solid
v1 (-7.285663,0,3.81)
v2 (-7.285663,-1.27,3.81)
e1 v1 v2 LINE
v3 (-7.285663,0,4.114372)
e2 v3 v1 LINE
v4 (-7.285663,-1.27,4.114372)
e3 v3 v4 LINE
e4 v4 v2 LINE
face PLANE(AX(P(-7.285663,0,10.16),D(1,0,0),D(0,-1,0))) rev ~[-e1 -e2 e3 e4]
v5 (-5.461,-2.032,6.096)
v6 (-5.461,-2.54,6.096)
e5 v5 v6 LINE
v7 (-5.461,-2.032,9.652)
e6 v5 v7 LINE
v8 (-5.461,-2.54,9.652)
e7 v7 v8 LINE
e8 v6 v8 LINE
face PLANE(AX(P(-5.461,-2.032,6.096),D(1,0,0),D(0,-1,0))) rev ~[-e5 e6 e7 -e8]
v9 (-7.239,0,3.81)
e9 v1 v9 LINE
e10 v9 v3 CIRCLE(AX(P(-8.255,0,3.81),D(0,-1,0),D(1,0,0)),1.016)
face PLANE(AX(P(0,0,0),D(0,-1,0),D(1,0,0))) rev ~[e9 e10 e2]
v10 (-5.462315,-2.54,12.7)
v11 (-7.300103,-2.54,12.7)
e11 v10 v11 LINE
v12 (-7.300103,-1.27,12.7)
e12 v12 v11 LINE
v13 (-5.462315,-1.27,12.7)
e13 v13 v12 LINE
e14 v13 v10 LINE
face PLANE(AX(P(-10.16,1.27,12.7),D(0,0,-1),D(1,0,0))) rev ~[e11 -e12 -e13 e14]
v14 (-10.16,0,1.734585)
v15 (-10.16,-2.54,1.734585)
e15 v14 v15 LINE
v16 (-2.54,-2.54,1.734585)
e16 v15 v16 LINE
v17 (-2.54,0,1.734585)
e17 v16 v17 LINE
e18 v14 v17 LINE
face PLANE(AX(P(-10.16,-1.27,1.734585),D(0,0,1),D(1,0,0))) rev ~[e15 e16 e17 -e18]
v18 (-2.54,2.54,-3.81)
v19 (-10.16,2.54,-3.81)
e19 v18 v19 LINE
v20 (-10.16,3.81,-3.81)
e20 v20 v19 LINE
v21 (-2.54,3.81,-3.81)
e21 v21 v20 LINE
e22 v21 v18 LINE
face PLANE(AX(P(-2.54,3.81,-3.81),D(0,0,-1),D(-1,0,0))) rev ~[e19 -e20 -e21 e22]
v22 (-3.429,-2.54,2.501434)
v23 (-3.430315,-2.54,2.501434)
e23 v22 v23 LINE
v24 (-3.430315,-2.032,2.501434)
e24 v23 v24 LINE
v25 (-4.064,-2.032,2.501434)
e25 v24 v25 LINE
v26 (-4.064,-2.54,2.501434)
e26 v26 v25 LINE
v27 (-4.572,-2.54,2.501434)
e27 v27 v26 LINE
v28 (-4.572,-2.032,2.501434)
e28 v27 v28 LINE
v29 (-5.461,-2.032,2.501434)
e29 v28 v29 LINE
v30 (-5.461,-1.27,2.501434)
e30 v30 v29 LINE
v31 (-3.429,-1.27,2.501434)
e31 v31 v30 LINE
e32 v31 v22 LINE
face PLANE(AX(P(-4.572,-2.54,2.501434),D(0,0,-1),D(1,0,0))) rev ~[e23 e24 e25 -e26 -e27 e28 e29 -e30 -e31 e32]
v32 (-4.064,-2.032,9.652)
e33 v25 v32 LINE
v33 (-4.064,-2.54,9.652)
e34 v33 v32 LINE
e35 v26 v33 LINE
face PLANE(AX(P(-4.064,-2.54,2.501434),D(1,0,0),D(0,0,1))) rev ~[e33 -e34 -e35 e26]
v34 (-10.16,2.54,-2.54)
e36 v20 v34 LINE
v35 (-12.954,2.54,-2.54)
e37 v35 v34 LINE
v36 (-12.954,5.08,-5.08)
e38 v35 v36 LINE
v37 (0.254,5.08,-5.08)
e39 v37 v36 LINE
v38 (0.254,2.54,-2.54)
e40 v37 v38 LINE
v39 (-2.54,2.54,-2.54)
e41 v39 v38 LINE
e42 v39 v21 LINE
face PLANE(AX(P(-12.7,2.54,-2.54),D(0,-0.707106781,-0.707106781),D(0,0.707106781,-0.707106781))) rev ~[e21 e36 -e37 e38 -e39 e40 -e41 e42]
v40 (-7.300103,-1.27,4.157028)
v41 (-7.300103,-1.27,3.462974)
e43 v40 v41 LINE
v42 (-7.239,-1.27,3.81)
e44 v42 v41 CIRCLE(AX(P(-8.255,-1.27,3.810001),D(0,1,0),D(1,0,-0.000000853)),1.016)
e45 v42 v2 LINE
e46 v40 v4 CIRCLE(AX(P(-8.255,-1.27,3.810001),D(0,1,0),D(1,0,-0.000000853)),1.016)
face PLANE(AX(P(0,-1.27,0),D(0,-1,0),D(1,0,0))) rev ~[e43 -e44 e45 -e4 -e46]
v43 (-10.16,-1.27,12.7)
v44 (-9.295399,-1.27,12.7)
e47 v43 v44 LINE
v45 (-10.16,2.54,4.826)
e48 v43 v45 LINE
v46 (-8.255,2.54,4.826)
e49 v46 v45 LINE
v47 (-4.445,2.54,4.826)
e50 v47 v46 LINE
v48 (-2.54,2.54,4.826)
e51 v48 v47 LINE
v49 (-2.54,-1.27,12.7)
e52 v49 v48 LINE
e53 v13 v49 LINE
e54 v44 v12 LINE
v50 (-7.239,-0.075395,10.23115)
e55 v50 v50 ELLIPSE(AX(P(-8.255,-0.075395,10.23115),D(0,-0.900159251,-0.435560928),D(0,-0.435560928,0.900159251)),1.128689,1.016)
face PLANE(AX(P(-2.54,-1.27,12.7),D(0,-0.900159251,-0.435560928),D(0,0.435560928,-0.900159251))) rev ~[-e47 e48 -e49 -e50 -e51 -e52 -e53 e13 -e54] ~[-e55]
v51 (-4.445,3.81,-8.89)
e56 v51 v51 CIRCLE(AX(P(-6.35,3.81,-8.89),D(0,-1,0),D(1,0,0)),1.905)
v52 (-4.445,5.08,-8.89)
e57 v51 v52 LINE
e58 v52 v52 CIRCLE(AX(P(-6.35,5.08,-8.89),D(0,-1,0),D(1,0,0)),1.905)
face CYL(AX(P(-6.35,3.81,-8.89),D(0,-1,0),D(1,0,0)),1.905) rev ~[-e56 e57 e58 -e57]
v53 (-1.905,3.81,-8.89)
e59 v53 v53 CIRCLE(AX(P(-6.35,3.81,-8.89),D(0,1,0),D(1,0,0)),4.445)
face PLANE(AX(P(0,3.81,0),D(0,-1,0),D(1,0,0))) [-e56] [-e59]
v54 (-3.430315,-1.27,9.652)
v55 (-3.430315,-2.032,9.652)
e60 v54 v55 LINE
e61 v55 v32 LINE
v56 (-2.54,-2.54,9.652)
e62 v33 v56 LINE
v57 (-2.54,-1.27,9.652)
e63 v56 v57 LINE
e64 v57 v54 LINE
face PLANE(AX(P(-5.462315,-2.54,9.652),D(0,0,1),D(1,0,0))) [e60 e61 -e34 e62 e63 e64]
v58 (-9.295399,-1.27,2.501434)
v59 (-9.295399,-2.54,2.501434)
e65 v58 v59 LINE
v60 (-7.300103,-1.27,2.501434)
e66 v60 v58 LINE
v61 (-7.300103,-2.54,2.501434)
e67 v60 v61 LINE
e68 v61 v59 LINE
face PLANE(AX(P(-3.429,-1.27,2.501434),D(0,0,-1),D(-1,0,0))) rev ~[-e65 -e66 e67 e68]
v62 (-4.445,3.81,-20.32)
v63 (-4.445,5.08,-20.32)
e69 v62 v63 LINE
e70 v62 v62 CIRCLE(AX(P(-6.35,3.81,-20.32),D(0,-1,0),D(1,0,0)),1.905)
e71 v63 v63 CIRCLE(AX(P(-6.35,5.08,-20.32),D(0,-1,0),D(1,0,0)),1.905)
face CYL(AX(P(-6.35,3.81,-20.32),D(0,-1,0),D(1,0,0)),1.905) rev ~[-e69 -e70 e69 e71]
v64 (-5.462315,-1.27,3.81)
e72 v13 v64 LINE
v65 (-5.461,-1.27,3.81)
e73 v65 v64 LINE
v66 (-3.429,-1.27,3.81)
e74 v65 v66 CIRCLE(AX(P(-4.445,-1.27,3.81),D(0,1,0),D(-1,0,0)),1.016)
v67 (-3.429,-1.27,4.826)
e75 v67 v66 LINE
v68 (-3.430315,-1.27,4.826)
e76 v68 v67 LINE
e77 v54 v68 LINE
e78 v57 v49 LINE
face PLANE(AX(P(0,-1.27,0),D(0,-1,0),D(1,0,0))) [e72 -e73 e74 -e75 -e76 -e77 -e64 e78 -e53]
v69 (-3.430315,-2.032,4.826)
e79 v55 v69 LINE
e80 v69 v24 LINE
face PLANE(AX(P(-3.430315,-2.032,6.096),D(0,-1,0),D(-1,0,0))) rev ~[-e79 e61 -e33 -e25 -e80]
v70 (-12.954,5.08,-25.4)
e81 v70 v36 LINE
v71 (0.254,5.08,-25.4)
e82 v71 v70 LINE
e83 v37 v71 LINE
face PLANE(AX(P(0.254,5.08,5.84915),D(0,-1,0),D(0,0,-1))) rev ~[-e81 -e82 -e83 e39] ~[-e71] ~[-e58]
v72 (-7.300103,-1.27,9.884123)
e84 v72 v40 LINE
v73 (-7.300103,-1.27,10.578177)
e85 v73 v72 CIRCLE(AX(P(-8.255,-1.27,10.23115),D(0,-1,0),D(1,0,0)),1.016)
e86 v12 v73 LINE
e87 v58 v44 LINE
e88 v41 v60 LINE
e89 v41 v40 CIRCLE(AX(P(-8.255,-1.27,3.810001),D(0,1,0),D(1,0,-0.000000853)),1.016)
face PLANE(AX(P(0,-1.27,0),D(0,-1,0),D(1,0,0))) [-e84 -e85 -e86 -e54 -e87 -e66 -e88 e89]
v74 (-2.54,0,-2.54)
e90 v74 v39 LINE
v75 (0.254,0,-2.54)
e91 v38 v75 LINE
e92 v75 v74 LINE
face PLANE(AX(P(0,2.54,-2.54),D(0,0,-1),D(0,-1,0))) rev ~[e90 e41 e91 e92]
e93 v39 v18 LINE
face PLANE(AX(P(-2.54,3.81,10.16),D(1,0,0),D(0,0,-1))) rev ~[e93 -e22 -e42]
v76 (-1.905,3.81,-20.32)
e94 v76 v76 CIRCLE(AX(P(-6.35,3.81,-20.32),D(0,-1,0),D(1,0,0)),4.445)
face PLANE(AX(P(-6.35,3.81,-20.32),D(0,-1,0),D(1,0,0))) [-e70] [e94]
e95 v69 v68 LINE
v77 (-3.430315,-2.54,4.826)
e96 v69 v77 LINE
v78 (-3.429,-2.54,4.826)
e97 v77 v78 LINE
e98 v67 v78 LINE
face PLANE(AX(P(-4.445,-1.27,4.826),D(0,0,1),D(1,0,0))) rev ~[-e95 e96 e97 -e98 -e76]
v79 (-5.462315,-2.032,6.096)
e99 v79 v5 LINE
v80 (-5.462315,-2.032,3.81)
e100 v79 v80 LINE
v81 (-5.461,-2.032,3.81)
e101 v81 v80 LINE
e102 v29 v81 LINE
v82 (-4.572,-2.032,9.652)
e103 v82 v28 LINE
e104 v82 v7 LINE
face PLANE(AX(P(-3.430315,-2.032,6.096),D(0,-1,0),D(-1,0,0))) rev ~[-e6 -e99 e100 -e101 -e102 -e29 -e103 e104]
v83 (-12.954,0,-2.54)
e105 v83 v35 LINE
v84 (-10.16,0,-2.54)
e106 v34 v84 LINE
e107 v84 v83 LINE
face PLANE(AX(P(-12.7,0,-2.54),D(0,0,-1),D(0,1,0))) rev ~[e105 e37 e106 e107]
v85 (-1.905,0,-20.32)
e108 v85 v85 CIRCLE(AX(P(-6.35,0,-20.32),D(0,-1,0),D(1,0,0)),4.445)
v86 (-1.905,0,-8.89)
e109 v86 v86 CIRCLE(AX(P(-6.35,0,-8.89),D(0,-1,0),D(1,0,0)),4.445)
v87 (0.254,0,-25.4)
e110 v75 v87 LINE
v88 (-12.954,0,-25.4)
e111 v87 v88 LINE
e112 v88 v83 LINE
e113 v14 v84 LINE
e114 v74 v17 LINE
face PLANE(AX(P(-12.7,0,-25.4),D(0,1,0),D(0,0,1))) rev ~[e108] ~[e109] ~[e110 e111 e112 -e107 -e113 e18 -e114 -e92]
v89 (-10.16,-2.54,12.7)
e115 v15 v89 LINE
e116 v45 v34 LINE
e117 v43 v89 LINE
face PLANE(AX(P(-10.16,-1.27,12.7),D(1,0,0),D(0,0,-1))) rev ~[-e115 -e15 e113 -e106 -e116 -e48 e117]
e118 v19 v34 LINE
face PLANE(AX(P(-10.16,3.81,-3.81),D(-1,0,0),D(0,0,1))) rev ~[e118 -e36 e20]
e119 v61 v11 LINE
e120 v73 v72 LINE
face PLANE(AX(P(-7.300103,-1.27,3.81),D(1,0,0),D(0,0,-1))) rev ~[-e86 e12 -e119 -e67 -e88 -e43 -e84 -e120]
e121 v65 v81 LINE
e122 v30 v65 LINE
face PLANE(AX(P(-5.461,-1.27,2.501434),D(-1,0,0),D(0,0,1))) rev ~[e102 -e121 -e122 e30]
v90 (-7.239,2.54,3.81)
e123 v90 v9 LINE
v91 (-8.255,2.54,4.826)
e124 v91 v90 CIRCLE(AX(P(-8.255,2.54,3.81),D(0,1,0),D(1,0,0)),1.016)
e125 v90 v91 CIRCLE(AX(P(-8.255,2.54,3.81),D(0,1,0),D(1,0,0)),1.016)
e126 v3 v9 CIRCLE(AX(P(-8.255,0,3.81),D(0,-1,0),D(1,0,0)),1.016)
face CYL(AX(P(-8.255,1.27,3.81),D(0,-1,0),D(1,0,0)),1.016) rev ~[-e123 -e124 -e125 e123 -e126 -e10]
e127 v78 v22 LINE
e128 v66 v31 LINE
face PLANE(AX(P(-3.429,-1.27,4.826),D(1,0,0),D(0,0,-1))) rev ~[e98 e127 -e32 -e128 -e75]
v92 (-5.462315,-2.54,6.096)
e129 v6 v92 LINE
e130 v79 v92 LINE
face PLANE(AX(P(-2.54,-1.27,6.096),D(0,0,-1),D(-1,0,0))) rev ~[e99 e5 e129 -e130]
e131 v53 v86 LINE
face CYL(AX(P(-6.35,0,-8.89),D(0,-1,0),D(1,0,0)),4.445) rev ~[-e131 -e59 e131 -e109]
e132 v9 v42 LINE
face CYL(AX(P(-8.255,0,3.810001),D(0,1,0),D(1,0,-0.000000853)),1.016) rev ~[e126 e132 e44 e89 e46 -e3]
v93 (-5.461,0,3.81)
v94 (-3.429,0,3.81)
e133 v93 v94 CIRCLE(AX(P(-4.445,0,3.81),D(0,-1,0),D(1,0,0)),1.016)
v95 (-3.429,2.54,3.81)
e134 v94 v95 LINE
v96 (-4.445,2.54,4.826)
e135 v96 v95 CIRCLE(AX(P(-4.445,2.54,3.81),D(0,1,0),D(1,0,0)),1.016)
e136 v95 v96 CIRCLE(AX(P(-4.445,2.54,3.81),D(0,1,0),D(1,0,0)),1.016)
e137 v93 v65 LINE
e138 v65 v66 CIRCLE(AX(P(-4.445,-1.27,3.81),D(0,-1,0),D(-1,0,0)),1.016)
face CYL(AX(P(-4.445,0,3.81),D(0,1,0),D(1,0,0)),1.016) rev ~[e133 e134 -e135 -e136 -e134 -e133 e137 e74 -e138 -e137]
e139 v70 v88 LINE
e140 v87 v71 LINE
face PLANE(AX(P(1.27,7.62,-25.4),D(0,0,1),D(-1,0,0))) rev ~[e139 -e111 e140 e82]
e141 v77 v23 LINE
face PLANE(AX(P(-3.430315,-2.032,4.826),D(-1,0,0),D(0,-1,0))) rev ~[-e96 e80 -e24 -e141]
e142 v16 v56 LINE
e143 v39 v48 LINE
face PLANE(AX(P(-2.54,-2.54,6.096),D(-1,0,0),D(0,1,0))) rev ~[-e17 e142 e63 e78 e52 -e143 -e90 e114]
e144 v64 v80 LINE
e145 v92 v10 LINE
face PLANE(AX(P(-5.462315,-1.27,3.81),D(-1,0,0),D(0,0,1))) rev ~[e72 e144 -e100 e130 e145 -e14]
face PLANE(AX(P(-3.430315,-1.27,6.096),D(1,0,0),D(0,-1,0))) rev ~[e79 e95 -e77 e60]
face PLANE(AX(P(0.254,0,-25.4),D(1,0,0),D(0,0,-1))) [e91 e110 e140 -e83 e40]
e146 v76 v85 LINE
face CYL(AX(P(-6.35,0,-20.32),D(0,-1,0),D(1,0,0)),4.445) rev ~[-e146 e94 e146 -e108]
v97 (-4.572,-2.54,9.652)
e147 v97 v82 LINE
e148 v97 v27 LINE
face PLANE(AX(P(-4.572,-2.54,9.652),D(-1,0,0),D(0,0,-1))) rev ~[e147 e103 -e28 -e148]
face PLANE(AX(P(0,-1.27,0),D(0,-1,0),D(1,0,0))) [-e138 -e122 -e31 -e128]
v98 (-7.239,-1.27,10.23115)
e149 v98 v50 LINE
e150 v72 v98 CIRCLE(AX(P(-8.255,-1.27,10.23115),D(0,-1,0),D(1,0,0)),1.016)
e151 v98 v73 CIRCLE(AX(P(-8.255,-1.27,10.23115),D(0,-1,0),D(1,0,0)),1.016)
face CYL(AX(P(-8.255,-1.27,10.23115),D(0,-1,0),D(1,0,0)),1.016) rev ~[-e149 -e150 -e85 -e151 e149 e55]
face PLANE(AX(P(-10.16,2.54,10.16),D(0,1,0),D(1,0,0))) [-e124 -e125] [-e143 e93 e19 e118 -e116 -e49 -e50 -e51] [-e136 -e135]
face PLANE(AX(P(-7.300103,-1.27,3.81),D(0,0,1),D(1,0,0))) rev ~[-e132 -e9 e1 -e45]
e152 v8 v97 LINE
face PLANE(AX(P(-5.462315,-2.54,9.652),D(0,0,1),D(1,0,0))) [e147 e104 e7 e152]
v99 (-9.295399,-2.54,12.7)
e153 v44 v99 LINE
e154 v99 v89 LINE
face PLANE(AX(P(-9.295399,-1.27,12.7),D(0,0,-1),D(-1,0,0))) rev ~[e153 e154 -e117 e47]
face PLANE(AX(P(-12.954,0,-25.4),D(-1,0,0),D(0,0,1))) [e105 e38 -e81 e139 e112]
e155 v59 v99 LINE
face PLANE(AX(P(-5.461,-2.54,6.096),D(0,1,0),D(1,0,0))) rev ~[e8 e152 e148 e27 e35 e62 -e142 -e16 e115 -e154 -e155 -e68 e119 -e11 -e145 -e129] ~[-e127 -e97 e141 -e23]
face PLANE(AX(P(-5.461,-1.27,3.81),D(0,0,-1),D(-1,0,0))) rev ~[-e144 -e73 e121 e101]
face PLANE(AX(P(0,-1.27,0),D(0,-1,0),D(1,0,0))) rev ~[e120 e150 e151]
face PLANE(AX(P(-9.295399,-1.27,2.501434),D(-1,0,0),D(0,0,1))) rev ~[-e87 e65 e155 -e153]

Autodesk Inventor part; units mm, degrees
ref_plane "YZ Plane" through (0, 0, 0) normal (1, 0, 0) x (0, 1, 0)
ref_plane "XZ Plane" through (0, 0, 0) normal (0, 1, 0) x (-1, 0, 0)
ref_plane "XY Plane" through (0, 0, 0) normal (0, 0, 1) x (1, 0, 0)
sketch "Sketch1" plane through (0, 0, 0) normal (0, 1, 0) x (-1, 0, 0)
  line L0 (0, 0) -> (12.7, 0)
  line L1 (12.7, 0) -> (12.7, -25.4)
  line L2 (12.7, -25.4) -> (0, -25.4)
  line L3 (0, -25.4) -> (0, 0)
  dimension "d0" = 12.7
  dimension "d1" = 25.4
sketch "Sketch1 outline for Extrusion1" plane through (0, 0, 0) normal (0, 1, 0) x (-1, 0, 0)
  line L0 (0, 0) -> (0, -25.4)
  line L1 (12.7, 0) -> (0, 0)
  line L2 (12.7, -25.4) -> (12.7, 0)
  line L3 (0, -25.4) -> (12.7, -25.4)
extrude "Extrusion1" add sketch "Sketch1 outline for Extrusion1" along normal blind 7.62
sketch "Sketch2" plane through (0, 0, 0) normal (1, 0, 0) x (0, 0, -1)
  line L0 (25.4, 7.62) -> (0, 7.62) projected
  line L1 (25.4, 0) -> (0, 0) projected
  line L2 (0, 7.62) -> (7.62, 7.62)
  line L3 (7.62, 7.62) -> (7.62, 0)
  line L4 (7.62, 0) -> (0, 0)
  line L5 (0, 0) -> (0, 7.62)
  line L6 (0, 0) -> (7.62, 7.62)
  dimension "d4" = 7.62
sketch "Sketch2 outline for Extrusion2" plane through (0, 0, 0) normal (1, 0, 0) x (0, 0, -1)
  line L0 (0, 7.62) -> (0, 0)
  line L1 (7.62, 7.62) -> (0, 7.62)
  line L2 (0, 0) -> (7.62, 7.62)
extrude "Extrusion2" cut sketch "Sketch2 outline for Extrusion2" against normal blind 25.4
sketch "Sketch3" plane through (0, 0, 0) normal (0, -1, 0) x (1, 0, 0)
  line L0 (-12.7, -25.4) -> (-12.7, 0) projected
  line L1 (0, 0) -> (-12.7, 0)
  line L2 (-12.7, 0) -> (-12.7, -8.89)
  line L3 (-12.7, -8.89) -> (0, -8.89)
  line L4 (0, -8.89) -> (0, 0)
  circle A0 centre (-6.35, -8.89) radius 4.445
  dimension "d7" = 8.89
  dimension "d8" = 8.89
sketch "Sketch3 outline for Extrusion3" plane through (0, 0, 0) normal (0, -1, 0) x (1, 0, 0)
  circle A0 centre (-6.35, -8.89) radius 4.445
extrude "Extrusion3" cut sketch "Sketch3 outline for Extrusion3" against normal blind 3.81
sketch "Sketch4" plane through (0, 0, 0) normal (0, -1, 0) x (1, 0, 0)
  circle A0 centre (-6.35, -8.89) radius 4.445 projected
  line L0 (-6.35, -8.89) -> (-6.35, -20.32)
  circle A1 centre (-6.35, -20.32) radius 4.445
  point P0 (0, 0)
  dimension "d11" = 11.43
  dimension "d12" = 8.89
sketch "Sketch4 outline for Extrusion4" plane through (0, 0, 0) normal (0, -1, 0) x (1, 0, 0)
  circle A0 centre (-6.35, -20.32) radius 4.445
extrude "Extrusion4" cut sketch "Sketch4 outline for Extrusion4" against normal blind 2.54
sketch "Sketch6" plane through (0, 0, -25.4) normal (1, 0, 0) x (0, 0, -1)
  line L0 (-25.4, 0) -> (-22.86, 0)
  line L1 (-22.86, 0) -> (-22.86, 2.54)
  line L2 (-22.86, 2.54) -> (-25.4, 2.54)
  line L3 (-25.4, 2.54) -> (-25.4, 0)
  dimension "d18" = 2.54
  dimension "d19" = 2.54
sketch "Sketch6 outline for Extrusion6" plane through (0, 0, -25.4) normal (1, 0, 0) x (0, 0, -1)
  line L0 (-25.4, 0) -> (-22.86, 0)
  line L1 (-25.4, 2.54) -> (-25.4, 0)
  line L2 (-22.86, 2.54) -> (-25.4, 2.54)
  line L3 (-22.86, 0) -> (-22.86, 2.54)
extrude "Extrusion6" cut sketch "Sketch6 outline for Extrusion6" against normal blind 25.4
sketch "Sketch7" plane through (0, 0, -2.54) normal (0, 0, 1) x (1, 0, 0)
  line L0 (-12.7, 0) -> (-12.7, 2.54) projected
  line L1 (0, 0) -> (-12.7, 0) projected
  line L2 (0, 2.54) -> (0, 0) projected
  line L3 (-12.7, 2.54) -> (0, 2.54) projected
sketch "Sketch7 outline for Extrusion7" plane through (0, 0, -2.54) normal (0, 0, 1) x (1, 0, 0)
  line L0 (-12.7, 0) -> (0, 0)
  line L1 (-12.7, 2.54) -> (-12.7, 0)
  line L2 (0, 2.54) -> (-12.7, 2.54)
  line L3 (0, 0) -> (0, 2.54)
extrude "Extrusion7" add sketch "Sketch7 outline for Extrusion7" along normal blind 12.7
sketch "Sketch13" plane through (0, 0, 0) normal (0, -1, 0) x (1, 0, 0)
  line L0 (-12.7, -2.54) -> (-12.7, -7.62) projected
  line L1 (0, -2.54) -> (0, 10.16) projected
  line L2 (-12.7, -2.54) -> (0, -2.54)
  line L3 (0, -2.54) -> (0, 10.16)
  line L4 (0, 10.16) -> (-12.7, 10.16)
  line L5 (-12.7, 10.16) -> (-12.7, -2.54)
  line L6 (0, -7.62) -> (0, -2.54) projected
  line L7 (-12.7, 10.16) -> (0, 10.16) projected
  line L8 (0, -2.54) -> (-2.54, -2.54)
  line L9 (-2.54, -2.54) -> (-2.54, 10.16)
  line L10 (-2.54, 10.16) -> (0, 10.16)
  line L11 (0, 10.16) -> (0, -2.54)
  line L12 (-12.7, -2.54) -> (-10.16, -2.54)
  line L13 (-10.16, -2.54) -> (-10.16, 10.16)
  line L14 (-10.16, 10.16) -> (-12.7, 10.16)
  line L15 (-12.7, 10.16) -> (-12.7, -2.54)
  point P0 (0, 0)
  dimension "d43" = 2.54
  dimension "d44" = 2.54
sketch "Sketch13 outline for Extrusion13" plane through (0, 0, 0) normal (0, -1, 0) x (1, 0, 0)
  line L0 (-10.16, -2.54) -> (-10.16, 10.16)
  line L1 (-12.7, -2.54) -> (-10.16, -2.54)
  line L2 (-12.7, 10.16) -> (-12.7, -2.54)
  line L3 (-10.16, 10.16) -> (-12.7, 10.16)
  line L4 (-2.54, 10.16) -> (-2.54, -2.54)
  line L5 (0, 10.16) -> (-2.54, 10.16)
  line L6 (0, -2.54) -> (0, 10.16)
  line L7 (-2.54, -2.54) -> (0, -2.54)
extrude "Extrusion13" cut sketch "Sketch13 outline for Extrusion13" against normal blind 2.54
sketch "Sketch18" plane through (0, 0, 0) normal (0, -1, 0) x (1, 0, 0)
  line L0 (-2.54, 10.16) -> (-10.16, 10.16) projected
  line L1 (-10.16, -2.54) -> (-10.16, 10.16) projected
  line L2 (-2.54, 10.16) -> (-10.16, 10.16)
  line L3 (-10.16, 10.16) -> (-10.16, 2.54)
  line L4 (-10.16, 2.54) -> (-2.54, 2.54)
  line L5 (-2.54, 2.54) -> (-2.54, 10.16)
  line L6 (-10.16, -2.54) -> (-2.54, -2.54) projected
  line L7 (-6.35, -2.54) -> (-6.35, 10.16)
  line L8 (-6.35, -2.54) -> (-2.54, -2.54)
  line L9 (-2.54, -2.54) -> (-4.445, -2.54)
  line L10 (-4.445, 10.16) -> (-4.445, -2.54)
  line L11 (-10.16, -2.54) -> (-6.35, -2.54)
  line L12 (-8.255, -2.54) -> (-8.255, 10.16)
  circle A0 centre (-4.445, 3.81) radius 1.016
  circle A1 centre (-8.255, 3.81) radius 1.016
  point P0 (0, 0)
  dimension "d63" = 7.62
  dimension "d64" = 2.032
  dimension "d65" = 2.032
sketch "Sketch18 outline for Extrusion18" plane through (0, 0, 0) normal (0, -1, 0) x (1, 0, 0)
  circle A0 centre (-8.255, 3.81) radius 1.016
  circle A1 centre (-4.445, 3.81) radius 1.016
extrude "Extrusion18" cut sketch "Sketch18 outline for Extrusion18" against normal blind 25.4
sketch "Sketch19" plane through (0, 0, 0) normal (0, -1, 0) x (1, 0, 0)
  circle A0 centre (-4.445, 3.81) radius 1.016
  line L0 (-2.54, 10.16) -> (-10.16, 10.16)
  line L1 (-5.461, 3.81) -> (-7.285663, 3.81)
  line L2 (-7.285663, 3.81) -> (-7.285663, 10.16)
  line L3 (-7.285663, 10.16) -> (-5.461, 10.16)
  line L4 (-5.461, 10.16) -> (-5.461, 3.81)
  point P0 (0, 0)
sketch "Sketch19 outline for Extrusion19" plane through (0, 0, 0) normal (0, -1, 0) x (1, 0, 0)
  line L0 (-5.461, 3.81) -> (-5.461, 10.16)
  line L1 (-7.285663, 3.81) -> (-5.461, 3.81)
  line L2 (-7.285663, 10.16) -> (-7.285663, 3.81)
  line L3 (-5.461, 10.16) -> (-7.285663, 10.16)
extrude "Extrusion19" add sketch "Sketch19 outline for Extrusion19" along normal blind 2.54
sketch "Sketch20" plane through (0, 0, 0) normal (0, -1, 0) x (1, 0, 0)
  line L0 (-5.461, 3.81) -> (-7.239, 3.81) projected
  line L1 (-5.461, 3.81) -> (-7.239, 3.81)
  line L2 (-7.239, 3.81) -> (-7.239, 2.54)
  line L3 (-7.239, 2.54) -> (-5.461, 2.54)
  line L4 (-5.461, 2.54) -> (-5.461, 3.81)
  point P0 (0, 0)
  dimension "d70" = 1.27
sketch "Sketch20 outline for Extrusion20" plane through (0, 0, 0) normal (0, -1, 0) x (1, 0, 0)
  line L0 (-5.461, 2.54) -> (-5.461, 3.81)
  line L1 (-7.239, 2.54) -> (-5.461, 2.54)
  line L2 (-7.239, 3.81) -> (-7.239, 2.54)
  line L3 (-5.461, 3.81) -> (-7.239, 3.81)
extrude "Extrusion20" add sketch "Sketch20 outline for Extrusion20" along normal blind 2.54
sketch "Sketch21" plane through (-10.16, 2.54, 10.16) normal (0, 1, 0) x (1, 0, 0)
  circle A0 centre (1.905, 6.35) radius 1.016 projected
  circle A1 centre (5.715, 6.35) radius 1.016 projected
  line L0 (0, 12.7) -> (0, 0) projected
  line L1 (7.62, 0) -> (0, 0) projected
  line L2 (7.62, 0) -> (7.62, 12.7) projected
  line L3 (0, 12.7) -> (7.62, 12.7) projected
  point P0 (10.16, 10.16)
sketch "Sketch21 outline for Extrusion21" plane through (-10.16, 2.54, 10.16) normal (0, 1, 0) x (1, 0, 0)
  line L0 (7.62, 0) -> (7.62, 12.7)
  line L1 (0, 0) -> (7.62, 0)
  line L2 (7.62, 12.7) -> (0, 12.7)
  line L3 (0, 12.7) -> (0, 0)
  circle A0 centre (1.905, 6.35) radius 1.016
  circle A1 centre (5.715, 6.35) radius 1.016
extrude "Extrusion21" add sketch "Sketch21 outline for Extrusion21" along normal blind 1.27
sketch "Sketch22" plane through (-2.54, 2.54, -2.54) normal (0, 0, -1) x (-1, 0, 0)
  line L0 (7.62, 0) -> (0, 0) projected
  line L1 (7.62, 0) -> (7.62, 1.27) projected
  line L2 (0, 1.27) -> (7.62, 1.27) projected
  line L3 (0, 0) -> (0, 1.27) projected
  point P0 (-2.54, -2.54)
sketch "Sketch22 outline for Extrusion22" plane through (-2.54, 2.54, -2.54) normal (0, 0, -1) x (-1, 0, 0)
  line L0 (7.62, 0) -> (7.62, 1.27)
  line L1 (0, 0) -> (7.62, 0)
  line L2 (0, 1.27) -> (0, 0)
  line L3 (7.62, 1.27) -> (0, 1.27)
extrude "Extrusion22" add sketch "Sketch22 outline for Extrusion22" along normal blind 5.08
sketch "Sketch23" plane through (-6.35, 2.54, -8.89) normal (0, -1, 0) x (1, 0, 0)
  circle A0 centre (0, 0) radius 4.445
  point P0 (6.35, 8.89)
sketch "Sketch23 outline for Extrusion23" plane through (-6.35, 2.54, -8.89) normal (0, -1, 0) x (1, 0, 0)
  circle A0 centre (0, 0) radius 4.445
extrude "Extrusion23" cut sketch "Sketch23 outline for Extrusion23" against normal blind 1.27
sketch "Sketch24" plane through (-10.16, 3.81, 10.16) normal (0, 1, 0) x (1, 0, 0)
  line L0 (0, 0) -> (0, 13.97) projected
  line L1 (0, 0) -> (7.62, 0) projected
  line L2 (7.62, 0) -> (7.62, 13.97) projected
  line L3 (0, 13.97) -> (7.62, 13.97) projected
  circle A0 centre (5.715, 6.35) radius 1.016 projected
  circle A1 centre (1.905, 6.35) radius 1.016 projected
  point P0 (10.16, 10.16)
sketch "Sketch24 outline for Extrusion24" plane through (-10.16, 3.81, 10.16) normal (0, 1, 0) x (1, 0, 0)
  line L0 (7.62, 0) -> (7.62, 13.97)
  line L1 (0, 0) -> (7.62, 0)
  line L2 (7.62, 13.97) -> (0, 13.97)
  line L3 (0, 13.97) -> (0, 0)
  circle A0 centre (1.905, 6.35) radius 1.016
  circle A1 centre (5.715, 6.35) radius 1.016
extrude "Extrusion24" cut sketch "Sketch24 outline for Extrusion24" against normal blind 2.54
sketch "Sketch26" plane through (0, 0, 10.16) normal (0, 0, 1) x (1, 0, 0)
  line L0 (-2.54, 1.27) -> (-10.16, 1.27)
  line L1 (-10.16, 0) -> (-10.16, 1.27)
  line L2 (-10.16, 0) -> (-7.285663, 0)
  line L3 (-7.285663, 0) -> (-7.285663, -2.54)
  line L4 (-5.461, -2.54) -> (-7.285663, -2.54)
  line L5 (-5.461, 0) -> (-5.461, -2.54)
  line L6 (-5.461, 0) -> (-2.54, 0)
  line L7 (-2.54, 0) -> (-2.54, 1.27)
  point P0 (0, 0)
sketch "Sketch26 outline for Extrusion26" plane through (0, 0, 10.16) normal (0, 0, 1) x (1, 0, 0)
  line L0 (-5.461, 0) -> (-2.54, 0)
  line L1 (-5.461, -2.54) -> (-5.461, 0)
  line L2 (-7.285663, -2.54) -> (-5.461, -2.54)
  line L3 (-7.285663, 0) -> (-7.285663, -2.54)
  line L4 (-10.16, 0) -> (-7.285663, 0)
  line L5 (-10.16, 1.27) -> (-10.16, 0)
  line L6 (-2.54, 1.27) -> (-10.16, 1.27)
  line L7 (-2.54, 0) -> (-2.54, 1.27)
extrude "Extrusion26" add sketch "Sketch26 outline for Extrusion26" along normal blind 2.54
sketch "Sketch27" plane through (0, 0, -25.4) normal (1, 0, 0) x (0, 0, -1)
  line L0 (-22.86, 2.54) -> (-22.86, 0) projected
  line L1 (-22.86, 0) -> (0, 0) projected
  line L2 (0, 0) -> (0, 7.62) projected
  line L3 (-17.78, 7.62) -> (0, 7.62) projected
  line L4 (-17.78, 7.62) -> (-22.86, 2.54) projected
  point P0 (-25.4, 0)
sketch "Sketch27 outline for Extrusion27" plane through (0, 0, -25.4) normal (1, 0, 0) x (0, 0, -1)
  line L0 (-17.78, 7.62) -> (-22.86, 2.54)
  line L1 (0, 7.62) -> (-17.78, 7.62)
  line L2 (0, 0) -> (0, 7.62)
  line L3 (-22.86, 0) -> (0, 0)
  line L4 (-22.86, 2.54) -> (-22.86, 0)
extrude "Extrusion27" add sketch "Sketch27 outline for Extrusion27" along normal blind 1.27
sketch "Sketch28" plane through (-12.7, 0, -25.4) normal (-1, 0, 0) x (0, 0, 1)
  line L0 (0, 7.62) -> (17.78, 7.62) projected
  line L1 (0, 0) -> (0, 7.62) projected
  line L2 (0, 0) -> (22.86, 0) projected
  line L3 (22.86, 0) -> (22.86, 2.54) projected
  line L4 (22.86, 2.54) -> (17.78, 7.62) projected
  point P0 (25.4, 0)
sketch "Sketch28 outline for Extrusion28" plane through (-12.7, 0, -25.4) normal (-1, 0, 0) x (0, 0, 1)
  line L0 (0, 0) -> (22.86, 0)
  line L1 (0, 7.62) -> (0, 0)
  line L2 (17.78, 7.62) -> (0, 7.62)
  line L3 (22.86, 2.54) -> (17.78, 7.62)
  line L4 (22.86, 0) -> (22.86, 2.54)
extrude "Extrusion28" add sketch "Sketch28 outline for Extrusion28" along normal blind 1.27
sketch "Sketch29" plane through (0, -2.54, 0) normal (0, -1, 0) x (1, 0, 0)
  line L0 (-7.285663, 3.81) -> (-7.285663, 12.7)
  line L1 (-7.285663, 3.81) -> (-7.239, 3.81)
  line L2 (-7.239, 3.81) -> (-7.239, 2.54)
  line L3 (-7.239, 2.54) -> (-5.461, 2.54)
  line L4 (-5.461, 2.54) -> (-5.461, 12.7)
  line L5 (-7.285663, 12.7) -> (-5.461, 12.7)
  point P0 (0, 0)
sketch "Sketch29 outline for Extrusion29" plane through (0, -2.54, 0) normal (0, -1, 0) x (1, 0, 0)
  line L0 (-7.239, 3.81) -> (-7.239, 2.54)
  line L1 (-7.285663, 3.81) -> (-7.239, 3.81)
  line L2 (-7.285663, 12.7) -> (-7.285663, 3.81)
  line L3 (-5.461, 12.7) -> (-7.285663, 12.7)
  line L4 (-5.461, 2.54) -> (-5.461, 12.7)
  line L5 (-7.239, 2.54) -> (-5.461, 2.54)
extrude "Extrusion29" cut sketch "Sketch29 outline for Extrusion29" against normal blind 1.27
sketch "Sketch31" plane through (0, 7.62, 0) normal (0, 1, 0) x (1, 0, 0)
  point P0 (0, 0)
sketch "Sketch32" plane through (0, 7.62, 0) normal (0, 1, 0) x (1, 0, 0)
  point P0 (0, 0)
sketch "Sketch33" plane through (0, 7.62, 0) normal (0, 1, 0) x (1, 0, 0)
  line L0 (-13.97, 7.62) -> (1.27, 7.62) projected
  line L1 (1.27, 25.4) -> (1.27, 7.62) projected
  line L2 (-13.97, 25.4) -> (1.27, 25.4) projected
  line L3 (-13.97, 7.62) -> (-13.97, 25.4) projected
  point P0 (0, 0)
sketch "Sketch33 outline for Extrusion30" plane through (0, 7.62, 0) normal (0, 1, 0) x (1, 0, 0)
  line L0 (-13.97, 25.4) -> (-13.97, 7.62)
  line L1 (1.27, 25.4) -> (-13.97, 25.4)
  line L2 (1.27, 7.62) -> (1.27, 25.4)
  line L3 (-13.97, 7.62) -> (1.27, 7.62)
extrude "Extrusion30" add sketch "Sketch33 outline for Extrusion30" along normal blind 5.08
sketch "Sketch35" plane through (1.27, 0, -25.4) normal (1, 0, 0) x (0, 0, -1)
  point P0 (-25.4, 0)
sketch "Sketch36" plane through (1.27, 0, -25.4) normal (1, 0, 0) x (0, 0, -1)
  line L0 (-22.86, 2.54) -> (-22.86, 0) projected
  line L1 (-22.86, 0) -> (0, 0) projected
  line L2 (0, 0) -> (0, 12.7) projected
  line L3 (-17.78, 12.7) -> (0, 12.7) projected
  line L4 (-17.78, 7.62) -> (-17.78, 12.7) projected
  line L5 (-17.78, 7.62) -> (-22.86, 2.54) projected
  point P0 (-25.4, 0)
sketch "Sketch36 outline for Extrusion33" plane through (1.27, 0, -25.4) normal (1, 0, 0) x (0, 0, -1)
  line L0 (-17.78, 7.62) -> (-22.86, 2.54)
  line L1 (-17.78, 12.7) -> (-17.78, 7.62)
  line L2 (0, 12.7) -> (-17.78, 12.7)
  line L3 (0, 0) -> (0, 12.7)
  line L4 (-22.86, 0) -> (0, 0)
  line L5 (-22.86, 2.54) -> (-22.86, 0)
extrude "Extrusion33" cut sketch "Sketch36 outline for Extrusion33" against normal blind 0.254
sketch "Sketch37" plane through (-13.97, 0, -25.4) normal (-1, 0, 0) x (0, 0, 1)
  line L0 (22.86, 0) -> (22.86, 2.54) projected
  line L1 (22.86, 2.54) -> (17.78, 7.62) projected
  line L2 (17.78, 7.62) -> (17.78, 12.7) projected
  line L3 (0, 12.7) -> (17.78, 12.7) projected
  line L4 (0, 0) -> (0, 12.7) projected
  line L5 (0, 0) -> (22.86, 0) projected
  point P0 (25.4, 0)
sketch "Sketch37 outline for Extrusion34" plane through (-13.97, 0, -25.4) normal (-1, 0, 0) x (0, 0, 1)
  line L0 (0, 0) -> (22.86, 0)
  line L1 (0, 12.7) -> (0, 0)
  line L2 (17.78, 12.7) -> (0, 12.7)
  line L3 (17.78, 7.62) -> (17.78, 12.7)
  line L4 (22.86, 2.54) -> (17.78, 7.62)
  line L5 (22.86, 0) -> (22.86, 2.54)
extrude "Extrusion34" cut sketch "Sketch37 outline for Extrusion34" against normal blind 0.254
sketch "Sketch38" plane through (0, 0, 0) normal (0, -1, 0) x (1, 0, 0)
  line L0 (-10.16, -2.54) -> (-10.16, 12.7)
  line L1 (-2.54, -2.54) -> (-2.54, 12.7)
  line L2 (-10.16, 12.7) -> (-2.54, 12.7)
  line L3 (-2.54, 12.7) -> (-2.54, 1.734585)
  line L4 (-2.54, 1.734585) -> (-10.16, 1.734585)
  line L5 (-10.16, 1.734585) -> (-10.16, 12.7)
  circle A0 centre (-6.35, -8.89) radius 4.445
  circle A1 centre (-6.35, -20.32) radius 4.445
  line L6 (-13.716, -2.54) -> (-13.716, -25.4)
  line L7 (1.016, -25.4) -> (-13.716, -25.4)
  line L8 (1.016, -25.4) -> (1.016, -2.54)
  line L9 (1.016, -2.54) -> (-2.54, -2.54)
  line L10 (-2.54, -2.54) -> (-2.54, 12.7)
  line L11 (-5.461, 12.7) -> (-2.54, 12.7)
  line L12 (-5.461, 12.7) -> (-5.461, 3.81)
  circle A2 centre (-4.445, 3.81) radius 1.016
  line L13 (-5.461, 3.81) -> (-5.461, 2.54)
  line L14 (-5.461, 2.54) -> (-7.239, 2.54)
  line L15 (-7.239, 2.54) -> (-7.239, 3.81)
  arc A3 (-7.285663, 4.114372) -> (-7.239, 3.81) centre (-8.255, 3.81) ccw
  line L16 (-7.285663, 4.114372) -> (-7.285663, 12.7)
  line L17 (-10.16, 12.7) -> (-7.285663, 12.7)
  line L18 (-10.16, 12.7) -> (-10.16, -2.54)
  line L19 (-10.16, -2.54) -> (-13.716, -2.54)
  point P0 (0, 0)
sketch "Sketch38 outline for Extrusion35" plane through (0, 0, 0) normal (0, -1, 0) x (1, 0, 0)
  line L0 (-5.461, 2.54) -> (-7.239, 2.54)
  line L1 (-5.461, 3.81) -> (-5.461, 2.54)
  line L2 (-5.461, 12.7) -> (-5.461, 3.81)
  line L3 (-2.54, 12.7) -> (-5.461, 12.7)
  line L4 (-2.54, 1.734585) -> (-2.54, 12.7)
  line L5 (-10.16, 1.734585) -> (-2.54, 1.734585)
  line L6 (-10.16, 12.7) -> (-10.16, 1.734585)
  line L7 (-7.285663, 12.7) -> (-10.16, 12.7)
  line L8 (-7.285663, 4.114372) -> (-7.285663, 12.7)
  arc A0 (-7.239, 3.81) -> (-7.285663, 4.114372) centre (-8.255, 3.81) cw
  line L9 (-7.239, 2.54) -> (-7.239, 3.81)
  arc A1 (-5.461, 3.81) -> (-3.429, 3.81) centre (-4.445, 3.81) ccw
  arc A2 (-3.429, 3.81) -> (-5.461, 3.81) centre (-4.445, 3.81) ccw
extrude "Extrusion35" add sketch "Sketch38 outline for Extrusion35" along normal blind 1.27
sketch "Sketch39" plane through (0, -1.27, 0) normal (0, -1, 0) x (1, 0, 0)
  line L0 (-2.54, 12.7) -> (-10.16, 12.7)
  line L1 (-5.462315, 3.81) -> (-7.300103, 3.81)
  line L2 (-7.300103, 3.81) -> (-7.300103, 12.7)
  line L3 (-7.300103, 12.7) -> (-5.462315, 12.7)
  line L4 (-5.462315, 12.7) -> (-5.462315, 3.81)
  point P0 (0, 0)
sketch "Sketch39 outline for Extrusion36" plane through (0, -1.27, 0) normal (0, -1, 0) x (1, 0, 0)
  line L0 (-7.300103, 3.81) -> (-5.462315, 3.81)
  line L1 (-7.300103, 12.7) -> (-7.300103, 3.81)
  line L2 (-5.462315, 12.7) -> (-7.300103, 12.7)
  line L3 (-5.462315, 3.81) -> (-5.462315, 12.7)
extrude "Extrusion36" add sketch "Sketch39 outline for Extrusion36" along normal blind 1.27
sketch "Sketch40" plane through (0, -1.27, 0) normal (0, -1, 0) x (1, 0, 0)
  circle A0 centre (-4.445, 3.81) radius 1.016
  line L0 (-5.461, 3.81) -> (-7.300103, 3.81)
  line L1 (-7.300103, 3.81) -> (-7.300103, 2.501434)
  line L2 (-7.300103, 2.501434) -> (-5.461, 2.501434)
  line L3 (-5.461, 2.501434) -> (-5.461, 3.81)
  point P0 (0, 0)
sketch "Sketch40 outline for Extrusion37" plane through (0, -1.27, 0) normal (0, -1, 0) x (1, 0, 0)
  line L0 (-7.300103, 2.501434) -> (-5.461, 2.501434)
  line L1 (-7.300103, 3.81) -> (-7.300103, 2.501434)
  line L2 (-5.461, 3.81) -> (-7.300103, 3.81)
  line L3 (-5.461, 2.501434) -> (-5.461, 3.81)
extrude "Extrusion37" add sketch "Sketch40 outline for Extrusion37" along normal blind 1.27
sketch "Sketch41" plane through (-10.16, 1.27, 10.16) normal (0, 1, 0) x (1, 0, 0)
  line L0 (0, -2.54) -> (0, 8.425415)
  line L1 (7.62, 13.97) -> (7.62, 12.7)
  line L2 (0, 8.425415) -> (7.62, 8.425415)
  line L3 (7.62, 8.425415) -> (7.62, 13.97)
  line L4 (7.62, 13.97) -> (0, 13.97)
  line L5 (0, 13.97) -> (0, 8.425415)
  point P0 (10.16, 10.16)
sketch "Sketch41 outline for Extrusion38" plane through (-10.16, 1.27, 10.16) normal (0, 1, 0) x (1, 0, 0)
  line L0 (0, 8.425415) -> (7.62, 8.425415)
  line L1 (0, 13.97) -> (0, 8.425415)
  line L2 (7.62, 13.97) -> (0, 13.97)
  line L3 (7.62, 12.7) -> (7.62, 13.97)
  line L4 (7.62, 8.425415) -> (7.62, 12.7)
extrude "Extrusion38" add sketch "Sketch41 outline for Extrusion38" along normal blind 1.27
sketch "Sketch42" plane through (-10.16, 1.27, 10.16) normal (0, 1, 0) x (1, 0, 0)
  line L0 (0, 8.425415) -> (7.62, 8.425415)
  line L1 (7.62, 8.425415) -> (7.62, -2.54)
  line L2 (0, 8.425415) -> (7.62, 8.425415)
  line L3 (7.62, 8.425415) -> (7.62, 7.530789)
  line L4 (7.62, 7.530789) -> (0, 7.530789)
  line L5 (0, 7.530789) -> (0, 8.425415)
  point P0 (10.16, 10.16)
sketch "Sketch42 outline for Extrusion39" plane through (-10.16, 1.27, 10.16) normal (0, 1, 0) x (1, 0, 0)
  line L0 (0, 8.425415) -> (0, 7.530789)
  line L1 (7.62, 8.425415) -> (0, 8.425415)
  line L2 (7.62, 7.530789) -> (7.62, 8.425415)
  line L3 (0, 7.530789) -> (7.62, 7.530789)
extrude "Extrusion39" add sketch "Sketch42 outline for Extrusion39" along normal blind 1.27
sketch "Sketch43" plane through (-10.16, 1.27, 10.16) normal (0, 1, 0) x (1, 0, 0)
  circle A0 centre (1.905, 6.35) radius 1.016
  circle A1 centre (5.715, 6.35) radius 1.016
  line L0 (7.62, 7.530789) -> (0, 7.530789)
  line L1 (0, 7.530789) -> (0, -2.54)
  line L2 (7.62, -2.54) -> (0, -2.54)
  line L3 (7.62, 7.530789) -> (7.62, -2.54)
  point P0 (10.16, 10.16)
sketch "Sketch43 outline for Extrusion40" plane through (-10.16, 1.27, 10.16) normal (0, 1, 0) x (1, 0, 0)
  line L0 (7.62, -2.54) -> (7.62, 7.530789)
  line L1 (0, -2.54) -> (7.62, -2.54)
  line L2 (7.62, 7.530789) -> (0, 7.530789)
  line L3 (0, 7.530789) -> (0, -2.54)
  circle A0 centre (1.905, 6.35) radius 1.016
  circle A1 centre (5.715, 6.35) radius 1.016
extrude "Extrusion40" add sketch "Sketch43 outline for Extrusion40" along normal blind 1.27
sketch "Sketch44" plane through (1.016, 0, -25.4) normal (1, 0, 0) x (0, 0, -1)
  line L0 (0, 12.7) -> (-17.78, 12.7) projected
  line L1 (-17.78, 12.7) -> (-17.78, 7.62) projected
  line L2 (0, 12.7) -> (-17.78, 12.7)
  line L3 (-17.78, 12.7) -> (-17.78, 10.16)
  line L4 (-17.78, 10.16) -> (0, 10.16)
  line L5 (0, 10.16) -> (0, 12.7)
  point P0 (-25.4, 0)
sketch "Sketch44 outline for Extrusion41" plane through (1.016, 0, -25.4) normal (1, 0, 0) x (0, 0, -1)
  line L0 (0, 10.16) -> (0, 12.7)
  line L1 (-17.78, 10.16) -> (0, 10.16)
  line L2 (-17.78, 12.7) -> (-17.78, 10.16)
  line L3 (0, 12.7) -> (-17.78, 12.7)
extrude "Extrusion41" cut sketch "Sketch44 outline for Extrusion41" against normal blind 2540
sketch "Sketch45" plane through (1.016, 0, -25.4) normal (1, 0, 0) x (0, 0, -1)
  line L0 (0, 10.16) -> (-17.78, 10.16) projected
  line L1 (-17.78, 7.62) -> (-17.78, 10.16) projected
  line L2 (-22.86, 2.54) -> (-17.78, 7.62) projected
  line L3 (-22.86, 0) -> (-22.86, 2.54) projected
  line L4 (0, 0) -> (-22.86, 0) projected
  line L5 (0, 10.16) -> (0, 0) projected
  point P0 (-25.4, 0)
sketch "Sketch45 outline for Extrusion42" plane through (1.016, 0, -25.4) normal (1, 0, 0) x (0, 0, -1)
  line L0 (0, 0) -> (0, 10.16)
  line L1 (-22.86, 0) -> (0, 0)
  line L2 (-22.86, 2.54) -> (-22.86, 0)
  line L3 (-17.78, 7.62) -> (-22.86, 2.54)
  line L4 (-17.78, 10.16) -> (-17.78, 7.62)
  line L5 (0, 10.16) -> (-17.78, 10.16)
extrude "Extrusion42" cut sketch "Sketch45 outline for Extrusion42" against normal blind 0.762
sketch "Sketch46" plane through (-13.716, 0, -25.4) normal (-1, 0, 0) x (0, 0, 1)
  line L0 (17.78, 10.16) -> (0, 10.16) projected
  line L1 (0, 0) -> (0, 10.16) projected
  line L2 (22.86, 0) -> (0, 0) projected
  line L3 (22.86, 2.54) -> (22.86, 0) projected
  line L4 (17.78, 7.62) -> (22.86, 2.54) projected
  line L5 (17.78, 10.16) -> (17.78, 7.62) projected
  point P0 (25.4, 0)
sketch "Sketch46 outline for Extrusion43" plane through (-13.716, 0, -25.4) normal (-1, 0, 0) x (0, 0, 1)
  line L0 (17.78, 7.62) -> (17.78, 10.16)
  line L1 (22.86, 2.54) -> (17.78, 7.62)
  line L2 (22.86, 0) -> (22.86, 2.54)
  line L3 (0, 0) -> (22.86, 0)
  line L4 (0, 10.16) -> (0, 0)
  line L5 (17.78, 10.16) -> (0, 10.16)
extrude "Extrusion43" cut sketch "Sketch46 outline for Extrusion43" against normal blind 0.762
sketch "Sketch47" plane through (-2.54, 0, 1.734585) normal (1, 0, 0) x (0, 0, -1)
  line L0 (-2.422442, -1.27) -> (-10.965415, -1.27)
  line L1 (-10.965415, -1.27) -> (-3.091415, 2.54)
  line L2 (-3.091415, -1.27) -> (-3.091415, 2.54)
  line L3 (-10.965415, 2.54) -> (4.274585, 2.54)
  line L4 (-10.965415, 2.54) -> (-3.091415, 2.54)
  line L5 (-3.091415, 2.54) -> (-3.091415, -2.54)
  line L6 (-3.091415, -2.54) -> (-10.965415, -2.54)
  line L7 (-10.965415, -2.54) -> (-10.965415, 2.54)
  point P0 (1.734585, 0)
sketch "Sketch47 outline for Extrusion44" plane through (-2.54, 0, 1.734585) normal (1, 0, 0) x (0, 0, -1)
  line L0 (-10.965415, 2.54) -> (-10.965415, -1.27)
  line L1 (-3.091415, 2.54) -> (-10.965415, 2.54)
  line L2 (-10.965415, -1.27) -> (-3.091415, 2.54)
extrude "Extrusion44" cut sketch "Sketch47 outline for Extrusion44" against normal blind 25.4
sketch "Sketch49" plane through (0, -1.27, 0) normal (0, -1, 0) x (1, 0, 0)
  line L0 (-8.255, 4.826) -> (-4.445, 4.826)
  line L1 (-2.54, 1.734585) -> (-2.54, 12.7)
  line L2 (-5.498457, 4.826) -> (-2.54, 4.826)
  line L3 (-2.54, 4.826) -> (-2.54, 6.096)
  line L4 (-2.54, 6.096) -> (-5.498457, 6.096)
  line L5 (-5.498457, 6.096) -> (-5.498457, 4.826)
  point P0 (0, 0)
  dimension "d123" = 1.27
sketch "Sketch49 outline for Extrusion46" plane through (0, -1.27, 0) normal (0, -1, 0) x (1, 0, 0)
  line L0 (-5.498457, 6.096) -> (-5.498457, 4.826)
  line L1 (-2.54, 6.096) -> (-5.498457, 6.096)
  line L2 (-2.54, 4.826) -> (-2.54, 6.096)
  line L3 (-4.445, 4.826) -> (-2.54, 4.826)
  line L4 (-5.498457, 4.826) -> (-4.445, 4.826)
extrude "Extrusion46" add sketch "Sketch49 outline for Extrusion46" along normal blind 1.27
sketch "Sketch50" plane through (-5.462315, -1.27, 6.096) normal (0, 0, 1) x (1, 0, 0)
  line L0 (0, 0) -> (2.032, 0)
  line L1 (2.032, 0) -> (2.032, -0.762)
  line L2 (2.032, -0.762) -> (0, -0.762)
  line L3 (0, -0.762) -> (0, 0)
  point P0 (5.462315, 1.27)
  dimension "d126" = 2.032
  dimension "d127" = 0.762
sketch "Sketch50 outline for Extrusion47" plane through (-5.462315, -1.27, 6.096) normal (0, 0, 1) x (1, 0, 0)
  line L0 (0, 0) -> (0, -0.762)
  line L1 (2.032, 0) -> (0, 0)
  line L2 (2.032, -0.762) -> (2.032, 0)
  line L3 (0, -0.762) -> (2.032, -0.762)
extrude "Extrusion47" cut sketch "Sketch50 outline for Extrusion47" against normal blind 1.27
sketch "Sketch51" plane through (0, -1.27, 0) normal (0, -1, 0) x (1, 0, 0)
  circle A0 centre (-8.255, 10.23115) radius 1.016
  point P0 (0, 0)
  dimension "d130" = 2.032
sketch "Sketch51 outline for Extrusion48" plane through (0, -1.27, 0) normal (0, -1, 0) x (1, 0, 0)
  circle A0 centre (-8.255, 10.23115) radius 1.016
extrude "Extrusion48" cut sketch "Sketch51 outline for Extrusion48" against normal blind 25.4
sketch "Sketch52" plane through (-6.35, 2.54, -20.32) normal (0, -1, 0) x (1, 0, 0)
  circle A0 centre (0, 0) radius 4.445 projected
  circle A1 centre (0, 0) radius 4.445
  point P0 (6.35, 20.32)
sketch "Sketch52 outline for Extrusion49" plane through (-6.35, 2.54, -20.32) normal (0, -1, 0) x (1, 0, 0)
  circle A0 centre (0, 0) radius 4.445
extrude "Extrusion49" cut sketch "Sketch52 outline for Extrusion49" against normal blind 1.27
sketch "Sketch53" plane through (-6.35, 3.81, -8.89) normal (0, -1, 0) x (1, 0, 0)
  circle A0 centre (0, 0) radius 4.445 projected
  circle A1 centre (0, 0) radius 1.905
  circle A2 centre (0, -11.43) radius 4.445 projected
  circle A3 centre (0, -11.43) radius 1.905
  point P0 (6.35, 8.89)
  dimension "d135" = 3.81
  dimension "d136" = 3.81
sketch "Sketch53 outline for Extrusion50" plane through (-6.35, 3.81, -8.89) normal (0, -1, 0) x (1, 0, 0)
  circle A0 centre (0, 0) radius 1.905
  circle A1 centre (0, -11.43) radius 1.905
extrude "Extrusion50" cut sketch "Sketch53 outline for Extrusion50" against normal blind 25.4
sketch "Sketch54" plane through (0.254, 0, -25.4) normal (1, 0, 0) x (0, 0, -1)
  line L0 (0, 10.16) -> (-17.78, 10.16)
  line L1 (0, 10.16) -> (-31.24915, 10.16)
  line L2 (-31.24915, 10.16) -> (-31.24915, 5.08)
  line L3 (-31.24915, 5.08) -> (0, 5.08)
  line L4 (0, 5.08) -> (0, 10.16)
  point P0 (-25.4, 0)
  dimension "d139" = 5.08
sketch "Sketch54 outline for Extrusion51" plane through (0.254, 0, -25.4) normal (1, 0, 0) x (0, 0, -1)
  line L0 (0, 5.08) -> (0, 10.16)
  line L1 (-31.24915, 5.08) -> (0, 5.08)
  line L2 (-31.24915, 10.16) -> (-31.24915, 5.08)
  line L3 (-17.78, 10.16) -> (-31.24915, 10.16)
  line L4 (0, 10.16) -> (-17.78, 10.16)
extrude "Extrusion51" cut sketch "Sketch54 outline for Extrusion51" against normal blind 25.4
sketch "Sketch55" plane through (0, -1.27, 0) normal (0, -1, 0) x (1, 0, 0)
  line L0 (-2.54, 4.826) -> (-2.54, -2.54)
  line L1 (-2.54, 4.826) -> (-3.429, 4.826)
  line L2 (-3.429, 4.826) -> (-3.429, 2.501434)
  line L3 (-3.429, 2.501434) -> (-2.54, 2.501434)
  line L4 (-2.54, 2.501434) -> (-2.54, 4.826)
  line L5 (-10.16, 1.734585) -> (-2.54, 1.734585)
  line L6 (-2.54, 1.734585) -> (-2.54, 2.501434)
  line L7 (-2.54, 2.501434) -> (-10.16, 2.501434)
  line L8 (-10.16, 2.501434) -> (-10.16, 1.734585)
  line L9 (-7.300103, 12.7) -> (-10.16, 12.7)
  line L10 (-10.16, 2.501434) -> (-9.295399, 2.501434)
  line L11 (-9.295399, 2.501434) -> (-9.295399, 12.7)
  line L12 (-9.295399, 12.7) -> (-10.16, 12.7)
  line L13 (-10.16, 12.7) -> (-10.16, 2.501434)
  point P0 (0, 0)
  dimension "d142" = 0.8646
  dimension "d143" = 0.889
sketch "Sketch55 outline for Extrusion52" plane through (0, -1.27, 0) normal (0, -1, 0) x (1, 0, 0)
  line L0 (-10.16, 12.7) -> (-10.16, 2.501434)
  line L1 (-9.295399, 12.7) -> (-10.16, 12.7)
  line L2 (-9.295399, 2.501434) -> (-9.295399, 12.7)
  line L3 (-3.429, 2.501434) -> (-9.295399, 2.501434)
  line L4 (-3.429, 4.826) -> (-3.429, 2.501434)
  line L5 (-2.54, 4.826) -> (-3.429, 4.826)
  line L6 (-2.54, 1.734585) -> (-2.54, 4.826)
  line L7 (-10.16, 1.734585) -> (-2.54, 1.734585)
  line L8 (-10.16, 2.501434) -> (-10.16, 1.734585)
extrude "Extrusion52" add sketch "Sketch55 outline for Extrusion52" along normal blind 1.27
sketch "Sketch56" plane through (-3.430315, -2.032, 4.826) normal (0, 0, -1) x (-1, 0, 0)
  line L0 (2.032, -0.508) -> (-0.001315, -0.508)
  line L1 (0, 0) -> (0, 0.762)
  line L2 (-0.001315, -0.508) -> (0, -0.508)
  line L3 (0, -0.508) -> (0, 0)
  line L4 (0, 0) -> (-0.001315, 0)
  line L5 (-0.001315, 0) -> (-0.001315, -0.508)
  line L6 (2.032, 0) -> (0, 0)
  line L7 (2.032, 0) -> (0, 0)
  line L8 (0, 0) -> (0, -0.508)
  line L9 (0, -0.508) -> (2.032, -0.508)
  line L10 (2.032, -0.508) -> (2.032, 0)
  point P0 (-3.430315, 2.032)
sketch "Sketch56 outline for Extrusion53" plane through (-3.430315, -2.032, 4.826) normal (0, 0, -1) x (-1, 0, 0)
  line L0 (2.032, -0.508) -> (2.032, 0)
  line L1 (0, -0.508) -> (2.032, -0.508)
  line L2 (0, 0) -> (0, -0.508)
  line L3 (2.032, 0) -> (0, 0)
extrude "Extrusion53" add sketch "Sketch56 outline for Extrusion53" along normal blind 2.54
sketch "Sketch57" plane through (-5.462315, -2.54, 6.096) normal (0, 0, 1) x (1, 0, 0)
  line L0 (2.922315, 0) -> (0, 0)
  line L1 (2.032, 1.27) -> (2.922315, 1.27)
  line L2 (2.922315, 1.27) -> (2.922315, 0)
  line L3 (2.922315, 0) -> (2.032, 0)
  line L4 (2.032, 0) -> (2.032, 1.27)
  line L5 (2.032, 0.508) -> (0, 0.508)
  line L6 (0.001315, 0) -> (2.032, 0)
  line L7 (2.032, 0) -> (2.032, 0.508)
  line L8 (2.032, 0.508) -> (0.001315, 0.508)
  line L9 (0.001315, 0.508) -> (0.001315, 0)
  point P0 (5.462315, 2.54)
sketch "Sketch57 outline for Extrusion54" plane through (-5.462315, -2.54, 6.096) normal (0, 0, 1) x (1, 0, 0)
  line L0 (2.922315, 0) -> (2.922315, 1.27)
  line L1 (0.001315, 0) -> (2.922315, 0)
  line L2 (0.001315, 0.508) -> (0.001315, 0)
  line L3 (2.032, 0.508) -> (0.001315, 0.508)
  line L4 (2.032, 1.27) -> (2.032, 0.508)
  line L5 (2.922315, 1.27) -> (2.032, 1.27)
extrude "Extrusion54" add sketch "Sketch57 outline for Extrusion54" along normal blind 3.556
sketch "Sketch59" plane through (0, -2.54, 0) normal (0, -1, 0) x (1, 0, 0)
  line L0 (-5.461, 2.501434) -> (-3.429, 2.501434)
  line L1 (-3.430315, 9.652) -> (-5.461, 9.652)
  line L2 (-4.572, 2.501434) -> (-4.064, 2.501434)
  line L3 (-4.064, 2.501434) -> (-4.064, 9.652)
  line L4 (-4.064, 9.652) -> (-4.572, 9.652)
  line L5 (-4.572, 9.652) -> (-4.572, 2.501434)
  line L6 (-2.54, 1.734585) -> (-2.54, 9.652)
  point P0 (0, 0)
  dimension "d153" = 0.508
  dimension "d154" = 1.524
sketch "Sketch59 outline for Extrusion56" plane through (0, -2.54, 0) normal (0, -1, 0) x (1, 0, 0)
  line L0 (-4.572, 9.652) -> (-4.572, 2.501434)
  line L1 (-4.064, 9.652) -> (-4.572, 9.652)
  line L2 (-4.064, 2.501434) -> (-4.064, 9.652)
  line L3 (-4.572, 2.501434) -> (-4.064, 2.501434)
extrude "Extrusion56" cut sketch "Sketch59 outline for Extrusion56" against normal blind 0.508
properties part number "electrodeholder_screwon_4"
